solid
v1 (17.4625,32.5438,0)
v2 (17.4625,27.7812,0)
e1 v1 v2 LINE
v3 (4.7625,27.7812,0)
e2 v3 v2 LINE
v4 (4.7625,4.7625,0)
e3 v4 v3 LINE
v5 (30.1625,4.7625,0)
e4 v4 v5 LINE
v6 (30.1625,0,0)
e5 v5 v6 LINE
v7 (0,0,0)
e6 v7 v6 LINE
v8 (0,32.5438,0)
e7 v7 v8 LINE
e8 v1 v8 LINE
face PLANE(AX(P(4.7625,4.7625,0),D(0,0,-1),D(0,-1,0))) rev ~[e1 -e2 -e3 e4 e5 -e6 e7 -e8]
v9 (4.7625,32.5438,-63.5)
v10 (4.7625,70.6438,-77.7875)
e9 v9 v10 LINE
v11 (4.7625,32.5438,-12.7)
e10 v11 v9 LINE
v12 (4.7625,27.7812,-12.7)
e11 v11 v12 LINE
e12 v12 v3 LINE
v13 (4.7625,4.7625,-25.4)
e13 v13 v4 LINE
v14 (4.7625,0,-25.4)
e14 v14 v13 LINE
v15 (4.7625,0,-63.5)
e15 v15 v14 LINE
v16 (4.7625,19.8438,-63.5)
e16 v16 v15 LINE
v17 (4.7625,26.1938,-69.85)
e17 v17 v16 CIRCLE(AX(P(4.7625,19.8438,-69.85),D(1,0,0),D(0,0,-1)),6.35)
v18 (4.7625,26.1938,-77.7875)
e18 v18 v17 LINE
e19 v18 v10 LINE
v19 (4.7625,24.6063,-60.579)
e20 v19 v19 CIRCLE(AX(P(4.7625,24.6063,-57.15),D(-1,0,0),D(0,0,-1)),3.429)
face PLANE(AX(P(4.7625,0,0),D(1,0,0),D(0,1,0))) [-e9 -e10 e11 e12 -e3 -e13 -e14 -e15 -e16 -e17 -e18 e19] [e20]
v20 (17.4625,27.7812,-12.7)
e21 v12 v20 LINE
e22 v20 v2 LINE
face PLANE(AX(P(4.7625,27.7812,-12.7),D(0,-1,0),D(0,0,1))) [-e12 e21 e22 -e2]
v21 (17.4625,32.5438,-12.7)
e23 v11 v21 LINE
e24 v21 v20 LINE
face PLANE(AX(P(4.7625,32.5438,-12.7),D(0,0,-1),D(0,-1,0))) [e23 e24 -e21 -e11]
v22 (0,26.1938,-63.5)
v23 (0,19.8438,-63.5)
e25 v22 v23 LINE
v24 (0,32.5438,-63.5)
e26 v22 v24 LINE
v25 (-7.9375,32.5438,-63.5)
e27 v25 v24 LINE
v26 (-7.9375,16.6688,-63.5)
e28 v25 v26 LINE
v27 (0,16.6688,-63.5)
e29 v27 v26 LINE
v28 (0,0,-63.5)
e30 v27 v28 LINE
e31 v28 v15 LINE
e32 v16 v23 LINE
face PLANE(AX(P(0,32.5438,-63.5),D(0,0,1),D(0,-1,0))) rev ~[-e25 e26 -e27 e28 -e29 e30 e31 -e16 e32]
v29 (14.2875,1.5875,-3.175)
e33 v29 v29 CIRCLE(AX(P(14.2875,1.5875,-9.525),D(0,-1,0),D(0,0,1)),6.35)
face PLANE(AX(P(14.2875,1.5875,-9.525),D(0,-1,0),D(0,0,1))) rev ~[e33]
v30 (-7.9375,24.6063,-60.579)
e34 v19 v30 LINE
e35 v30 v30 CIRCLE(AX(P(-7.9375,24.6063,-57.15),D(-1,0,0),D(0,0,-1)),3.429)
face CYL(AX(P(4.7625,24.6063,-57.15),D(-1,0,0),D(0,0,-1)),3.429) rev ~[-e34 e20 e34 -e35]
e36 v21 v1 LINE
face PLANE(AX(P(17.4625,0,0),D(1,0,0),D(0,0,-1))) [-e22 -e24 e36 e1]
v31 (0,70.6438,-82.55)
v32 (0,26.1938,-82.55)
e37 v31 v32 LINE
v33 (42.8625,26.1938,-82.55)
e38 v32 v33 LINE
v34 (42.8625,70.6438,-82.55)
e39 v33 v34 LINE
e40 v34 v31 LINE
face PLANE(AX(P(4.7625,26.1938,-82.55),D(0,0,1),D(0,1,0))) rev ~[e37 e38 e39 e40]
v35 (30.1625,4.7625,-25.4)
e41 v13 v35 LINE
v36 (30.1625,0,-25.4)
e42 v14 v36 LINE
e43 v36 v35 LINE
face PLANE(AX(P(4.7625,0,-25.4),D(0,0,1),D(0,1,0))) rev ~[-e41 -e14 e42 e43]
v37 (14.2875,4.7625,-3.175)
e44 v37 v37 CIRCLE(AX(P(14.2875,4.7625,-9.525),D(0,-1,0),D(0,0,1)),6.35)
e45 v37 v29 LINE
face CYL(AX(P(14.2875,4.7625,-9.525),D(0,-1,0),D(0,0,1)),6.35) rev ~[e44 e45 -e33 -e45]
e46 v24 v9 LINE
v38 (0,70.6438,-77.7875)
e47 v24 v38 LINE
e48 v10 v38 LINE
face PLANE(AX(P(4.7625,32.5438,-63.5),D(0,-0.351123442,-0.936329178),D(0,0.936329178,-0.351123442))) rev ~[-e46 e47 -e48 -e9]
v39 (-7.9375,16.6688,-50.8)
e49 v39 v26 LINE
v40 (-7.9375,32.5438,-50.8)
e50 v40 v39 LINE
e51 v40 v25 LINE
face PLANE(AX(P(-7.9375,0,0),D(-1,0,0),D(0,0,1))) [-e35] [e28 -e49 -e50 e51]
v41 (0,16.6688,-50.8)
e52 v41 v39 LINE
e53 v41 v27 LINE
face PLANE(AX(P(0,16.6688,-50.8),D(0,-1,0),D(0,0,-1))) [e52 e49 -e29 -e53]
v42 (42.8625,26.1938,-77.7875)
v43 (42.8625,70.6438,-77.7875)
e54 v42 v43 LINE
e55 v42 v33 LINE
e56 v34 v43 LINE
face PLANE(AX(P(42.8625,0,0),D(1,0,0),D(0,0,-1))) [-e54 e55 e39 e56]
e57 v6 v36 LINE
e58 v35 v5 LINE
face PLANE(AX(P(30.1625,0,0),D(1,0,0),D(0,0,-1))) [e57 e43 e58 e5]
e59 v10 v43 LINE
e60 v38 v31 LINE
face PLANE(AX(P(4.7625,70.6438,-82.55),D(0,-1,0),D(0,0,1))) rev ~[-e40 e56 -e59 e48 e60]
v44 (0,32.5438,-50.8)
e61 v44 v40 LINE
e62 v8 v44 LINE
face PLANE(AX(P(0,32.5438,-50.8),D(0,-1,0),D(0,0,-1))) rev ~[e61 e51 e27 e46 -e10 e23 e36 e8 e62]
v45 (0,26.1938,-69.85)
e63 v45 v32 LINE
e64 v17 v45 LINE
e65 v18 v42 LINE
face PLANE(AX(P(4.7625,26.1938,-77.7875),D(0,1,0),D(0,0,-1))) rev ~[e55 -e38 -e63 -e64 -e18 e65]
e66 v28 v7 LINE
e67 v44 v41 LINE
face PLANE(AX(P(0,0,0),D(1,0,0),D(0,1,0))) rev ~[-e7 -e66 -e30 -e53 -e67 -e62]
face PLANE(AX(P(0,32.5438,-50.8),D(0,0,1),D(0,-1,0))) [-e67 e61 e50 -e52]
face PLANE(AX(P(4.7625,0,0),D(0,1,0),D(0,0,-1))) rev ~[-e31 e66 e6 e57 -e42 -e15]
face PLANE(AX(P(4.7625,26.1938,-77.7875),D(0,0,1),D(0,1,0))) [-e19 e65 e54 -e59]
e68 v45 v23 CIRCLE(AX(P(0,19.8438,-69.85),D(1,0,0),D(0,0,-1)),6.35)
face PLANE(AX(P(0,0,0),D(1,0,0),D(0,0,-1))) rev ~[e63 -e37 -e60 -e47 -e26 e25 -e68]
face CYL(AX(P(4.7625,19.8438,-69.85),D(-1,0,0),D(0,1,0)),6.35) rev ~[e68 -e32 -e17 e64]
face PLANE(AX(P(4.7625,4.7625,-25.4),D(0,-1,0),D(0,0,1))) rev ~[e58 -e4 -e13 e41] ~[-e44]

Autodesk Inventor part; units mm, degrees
ref_plane "YZ Plane" through (0, 0, 0) normal (1, 0, 0) x (0, 1, 0)
ref_plane "XZ Plane" through (0, 0, 0) normal (0, 1, 0) x (-1, 0, 0)
ref_plane "XY Plane" through (0, 0, 0) normal (0, 0, 1) x (1, 0, 0)
sketch "Sketch1" plane through (0, 0, 0) normal (1, 0, 0) x (0, 1, 0)
  line L0 (0, 0) -> (32.5438, 0)
  line L1 (32.5438, 0) -> (32.5438, -63.5)
  line L2 (32.5438, -63.5) -> (0, -63.5)
  line L3 (0, -63.5) -> (0, 0)
  dimension "d0" = 32.5438
  dimension "d1" = 63.5
extrude "Extrusion1" add sketch "Sketch1" along normal blind 4.7625
sketch "Sketch2" plane through (4.7625, 0, 0) normal (1, 0, 0) x (0, 0, -1)
  line L0 (0, 32.5438) -> (0, 0) projected
  line L1 (0, 0) -> (63.5, 0) projected
  line L2 (63.5, 0) -> (63.5, 32.5438) projected
  line L3 (63.5, 32.5438) -> (0, 32.5438) projected
  line L4 (0, 32.5438) -> (12.7, 32.5438)
  line L5 (12.7, 32.5438) -> (12.7, 27.7812)
  line L6 (12.7, 27.7812) -> (0, 27.7812)
  line L7 (0, 27.7812) -> (0, 32.5438)
  dimension "d4" = 12.7
  dimension "d5" = 4.7625
extrude "Extrusion2" add sketch "Sketch2" along normal blind 12.7 contours L3 L5 L6 L0
sketch "Sketch3" plane through (4.7625, 0, 0) normal (1, 0, 0) x (0, 0, -1)
  line L0 (12.7, 27.7812) -> (0, 27.7812) projected
  line L1 (0, 27.7812) -> (0, 0) projected
  line L2 (0, 0) -> (63.5, 0) projected
  line L3 (63.5, 0) -> (63.5, 32.5438) projected
  line L4 (63.5, 32.5438) -> (12.7, 32.5438) projected
  line L5 (12.7, 32.5438) -> (12.7, 27.7812) projected
  line L6 (0, 0) -> (25.4, 0)
  line L7 (25.4, 0) -> (25.4, 4.7625)
  line L8 (25.4, 4.7625) -> (0, 4.7625)
  line L9 (0, 4.7625) -> (0, 0)
  dimension "d8" = 4.7625
extrude "Extrusion3" add sketch "Sketch3" along normal blind 25.4 contours L8 L7 L2 L1
sketch "Sketch4" plane through (0, 0, 0) normal (-1, 0, 0) x (0, 0, 1)
  line L0 (0, 0) -> (0, 32.5438) projected
  line L1 (0, 32.5438) -> (-63.5, 32.5438) projected
  line L2 (-63.5, 32.5438) -> (-63.5, 0) projected
  line L3 (-63.5, 0) -> (0, 0) projected
  line L4 (-63.5, 32.5438) -> (-12.7, 32.5438) projected
  line L5 (-63.5, 32.5438) -> (-50.8, 32.5438)
  line L6 (-50.8, 32.5438) -> (-50.8, 16.6688)
  line L7 (-50.8, 16.6688) -> (-63.5, 16.6688)
  line L8 (-63.5, 16.6688) -> (-63.5, 32.5438)
  dimension "d11" = 12.7
  dimension "d12" = 15.875
extrude "Extrusion4" add sketch "Sketch4" along normal blind 7.9375 contours L2 L1 L6 L7
sketch "Sketch5" plane through (4.7625, 0, 0) normal (1, 0, 0) x (0, 0, -1)
  line L0 (25.4, 4.7625) -> (25.4, 0) projected
  line L1 (25.4, 0) -> (63.5, 0) projected
  line L2 (63.5, 0) -> (63.5, 32.5438) projected
  line L3 (63.5, 32.5438) -> (12.7, 32.5438) projected
  line L4 (12.7, 32.5438) -> (12.7, 27.7812) projected
  line L5 (12.7, 27.7812) -> (0, 27.7812) projected
  line L6 (0, 27.7812) -> (0, 4.7625) projected
  line L7 (0, 4.7625) -> (25.4, 4.7625) projected
  line L8 (0, 32.5438) -> (0, 27.7812) projected
  line L9 (0, 27.7812) -> (12.7, 27.7812) projected
  line L10 (12.7, 27.7812) -> (12.7, 32.5438) projected
  line L11 (12.7, 32.5438) -> (0, 32.5438) projected
  point P0 (0, 0)
  point P1 (57.15, 24.6063)
  dimension "d15" = 4.7625
  dimension "d16" = 7.9375
  dimension "d17" = 6.35
hole "Hole1" at (4.7625, 24.6063, -57.15) direction (-1, 0, 0) diameter 6.858 end through all
sketch "Sketch6" plane through (4.7625, 4.7625, 0) normal (0, 1, 0) x (1, 0, 0)
  line L0 (0, 0) -> (0, 25.4) projected
  line L1 (0, 0) -> (25.4, 0) projected
  line L2 (25.4, 25.4) -> (25.4, 0) projected
  line L3 (0, 25.4) -> (25.4, 25.4) projected
  point P0 (-4.7625, 0)
  point P1 (9.525, 9.525)
  dimension "d25" = 9.525
  dimension "d26" = 9.525
hole "Hole2" at (14.2875, 4.7625, -9.525) direction (0, -1, 0) diameter 12.7 depth 3.175
sketch "Sketch8" plane through (4.7625, 0, 0) normal (1, 0, 0) x (0, 0, -1)
  circle A0 centre (57.15, 24.6063) radius 3.429 projected
  line L0 (25.4, 4.7625) -> (25.4, 0) projected
  line L1 (25.4, 0) -> (63.5, 0) projected
  line L2 (63.5, 0) -> (63.5, 32.5438) projected
  line L3 (63.5, 32.5438) -> (12.7, 32.5438) projected
  line L4 (12.7, 32.5438) -> (12.7, 27.7812) projected
  line L5 (12.7, 27.7812) -> (0, 27.7812) projected
  line L6 (0, 27.7812) -> (0, 4.7625) projected
  line L7 (0, 4.7625) -> (25.4, 4.7625) projected
  line L8 (63.5, 32.5438) -> (77.7875, 70.6438)
  line L9 (63.5, 32.5438) -> (104.1908, 32.5438) construction
  line L10 (77.7875, 70.6438) -> (82.55, 70.6438)
  line L11 (82.55, 70.6438) -> (82.55, 26.1938)
  line L12 (82.55, 26.1938) -> (77.7875, 26.1938)
  line L13 (77.7875, 26.1938) -> (77.7875, 70.6438)
  line L14 (77.7875, 26.1938) -> (63.5, 26.1938)
  point P0 (0, 0)
  dimension "d39" = 4.7625
  dimension "d40" = 44.45
  dimension "d41" = 38.1
  dimension "d47" = 25.4
extrude "Extrusion6" add sketch "Sketch8" against normal blind 4.7625 contours L2 L8 L13 L14 | L13 L10 L11 L12
sketch "Sketch9" plane through (4.7625, 0, 0) normal (1, 0, 0) x (0, 0, -1)
  circle A0 centre (57.15, 24.6063) radius 3.429 projected
  line L0 (25.4, 4.7625) -> (25.4, 0) projected
  line L1 (25.4, 0) -> (63.5, 0) projected
  line L2 (63.5, 0) -> (63.5, 26.1938) projected
  line L3 (63.5, 26.1938) -> (82.55, 26.1938) projected
  line L4 (82.55, 26.1938) -> (82.55, 70.6438) projected
  line L5 (82.55, 70.6438) -> (77.7875, 70.6438) projected
  line L6 (77.7875, 70.6438) -> (63.5, 32.5438) projected
  line L7 (63.5, 32.5438) -> (12.7, 32.5438) projected
  line L8 (12.7, 32.5438) -> (12.7, 27.7812) projected
  line L9 (12.7, 27.7812) -> (0, 27.7812) projected
  line L10 (0, 27.7812) -> (0, 4.7625) projected
  line L11 (0, 4.7625) -> (25.4, 4.7625) projected
  line L12 (77.7875, 70.6438) -> (82.55, 70.6438) projected
  line L13 (82.55, 38.8938) -> (82.55, 70.6438)
  line L14 (82.55, 26.1938) -> (82.55, 70.6438) projected
  line L15 (77.7875, 70.6438) -> (82.55, 70.6438)
  line L16 (82.55, 70.6438) -> (82.55, 26.1938)
  line L17 (82.55, 26.1938) -> (77.7875, 26.1938)
  line L18 (77.7875, 26.1938) -> (77.7875, 70.6438)
  point P0 (0, 0)
  point P1 (88.9, 26.1938)
extrude "Extrusion7" add sketch "Sketch9" along normal blind 38.1 contours L18 L5 L4 L3
fillet "Fillet1" radius 6.35 1 edges at (2.3813, 26.1938, -63.5)
properties part number "WheelIntake4.0Base"
